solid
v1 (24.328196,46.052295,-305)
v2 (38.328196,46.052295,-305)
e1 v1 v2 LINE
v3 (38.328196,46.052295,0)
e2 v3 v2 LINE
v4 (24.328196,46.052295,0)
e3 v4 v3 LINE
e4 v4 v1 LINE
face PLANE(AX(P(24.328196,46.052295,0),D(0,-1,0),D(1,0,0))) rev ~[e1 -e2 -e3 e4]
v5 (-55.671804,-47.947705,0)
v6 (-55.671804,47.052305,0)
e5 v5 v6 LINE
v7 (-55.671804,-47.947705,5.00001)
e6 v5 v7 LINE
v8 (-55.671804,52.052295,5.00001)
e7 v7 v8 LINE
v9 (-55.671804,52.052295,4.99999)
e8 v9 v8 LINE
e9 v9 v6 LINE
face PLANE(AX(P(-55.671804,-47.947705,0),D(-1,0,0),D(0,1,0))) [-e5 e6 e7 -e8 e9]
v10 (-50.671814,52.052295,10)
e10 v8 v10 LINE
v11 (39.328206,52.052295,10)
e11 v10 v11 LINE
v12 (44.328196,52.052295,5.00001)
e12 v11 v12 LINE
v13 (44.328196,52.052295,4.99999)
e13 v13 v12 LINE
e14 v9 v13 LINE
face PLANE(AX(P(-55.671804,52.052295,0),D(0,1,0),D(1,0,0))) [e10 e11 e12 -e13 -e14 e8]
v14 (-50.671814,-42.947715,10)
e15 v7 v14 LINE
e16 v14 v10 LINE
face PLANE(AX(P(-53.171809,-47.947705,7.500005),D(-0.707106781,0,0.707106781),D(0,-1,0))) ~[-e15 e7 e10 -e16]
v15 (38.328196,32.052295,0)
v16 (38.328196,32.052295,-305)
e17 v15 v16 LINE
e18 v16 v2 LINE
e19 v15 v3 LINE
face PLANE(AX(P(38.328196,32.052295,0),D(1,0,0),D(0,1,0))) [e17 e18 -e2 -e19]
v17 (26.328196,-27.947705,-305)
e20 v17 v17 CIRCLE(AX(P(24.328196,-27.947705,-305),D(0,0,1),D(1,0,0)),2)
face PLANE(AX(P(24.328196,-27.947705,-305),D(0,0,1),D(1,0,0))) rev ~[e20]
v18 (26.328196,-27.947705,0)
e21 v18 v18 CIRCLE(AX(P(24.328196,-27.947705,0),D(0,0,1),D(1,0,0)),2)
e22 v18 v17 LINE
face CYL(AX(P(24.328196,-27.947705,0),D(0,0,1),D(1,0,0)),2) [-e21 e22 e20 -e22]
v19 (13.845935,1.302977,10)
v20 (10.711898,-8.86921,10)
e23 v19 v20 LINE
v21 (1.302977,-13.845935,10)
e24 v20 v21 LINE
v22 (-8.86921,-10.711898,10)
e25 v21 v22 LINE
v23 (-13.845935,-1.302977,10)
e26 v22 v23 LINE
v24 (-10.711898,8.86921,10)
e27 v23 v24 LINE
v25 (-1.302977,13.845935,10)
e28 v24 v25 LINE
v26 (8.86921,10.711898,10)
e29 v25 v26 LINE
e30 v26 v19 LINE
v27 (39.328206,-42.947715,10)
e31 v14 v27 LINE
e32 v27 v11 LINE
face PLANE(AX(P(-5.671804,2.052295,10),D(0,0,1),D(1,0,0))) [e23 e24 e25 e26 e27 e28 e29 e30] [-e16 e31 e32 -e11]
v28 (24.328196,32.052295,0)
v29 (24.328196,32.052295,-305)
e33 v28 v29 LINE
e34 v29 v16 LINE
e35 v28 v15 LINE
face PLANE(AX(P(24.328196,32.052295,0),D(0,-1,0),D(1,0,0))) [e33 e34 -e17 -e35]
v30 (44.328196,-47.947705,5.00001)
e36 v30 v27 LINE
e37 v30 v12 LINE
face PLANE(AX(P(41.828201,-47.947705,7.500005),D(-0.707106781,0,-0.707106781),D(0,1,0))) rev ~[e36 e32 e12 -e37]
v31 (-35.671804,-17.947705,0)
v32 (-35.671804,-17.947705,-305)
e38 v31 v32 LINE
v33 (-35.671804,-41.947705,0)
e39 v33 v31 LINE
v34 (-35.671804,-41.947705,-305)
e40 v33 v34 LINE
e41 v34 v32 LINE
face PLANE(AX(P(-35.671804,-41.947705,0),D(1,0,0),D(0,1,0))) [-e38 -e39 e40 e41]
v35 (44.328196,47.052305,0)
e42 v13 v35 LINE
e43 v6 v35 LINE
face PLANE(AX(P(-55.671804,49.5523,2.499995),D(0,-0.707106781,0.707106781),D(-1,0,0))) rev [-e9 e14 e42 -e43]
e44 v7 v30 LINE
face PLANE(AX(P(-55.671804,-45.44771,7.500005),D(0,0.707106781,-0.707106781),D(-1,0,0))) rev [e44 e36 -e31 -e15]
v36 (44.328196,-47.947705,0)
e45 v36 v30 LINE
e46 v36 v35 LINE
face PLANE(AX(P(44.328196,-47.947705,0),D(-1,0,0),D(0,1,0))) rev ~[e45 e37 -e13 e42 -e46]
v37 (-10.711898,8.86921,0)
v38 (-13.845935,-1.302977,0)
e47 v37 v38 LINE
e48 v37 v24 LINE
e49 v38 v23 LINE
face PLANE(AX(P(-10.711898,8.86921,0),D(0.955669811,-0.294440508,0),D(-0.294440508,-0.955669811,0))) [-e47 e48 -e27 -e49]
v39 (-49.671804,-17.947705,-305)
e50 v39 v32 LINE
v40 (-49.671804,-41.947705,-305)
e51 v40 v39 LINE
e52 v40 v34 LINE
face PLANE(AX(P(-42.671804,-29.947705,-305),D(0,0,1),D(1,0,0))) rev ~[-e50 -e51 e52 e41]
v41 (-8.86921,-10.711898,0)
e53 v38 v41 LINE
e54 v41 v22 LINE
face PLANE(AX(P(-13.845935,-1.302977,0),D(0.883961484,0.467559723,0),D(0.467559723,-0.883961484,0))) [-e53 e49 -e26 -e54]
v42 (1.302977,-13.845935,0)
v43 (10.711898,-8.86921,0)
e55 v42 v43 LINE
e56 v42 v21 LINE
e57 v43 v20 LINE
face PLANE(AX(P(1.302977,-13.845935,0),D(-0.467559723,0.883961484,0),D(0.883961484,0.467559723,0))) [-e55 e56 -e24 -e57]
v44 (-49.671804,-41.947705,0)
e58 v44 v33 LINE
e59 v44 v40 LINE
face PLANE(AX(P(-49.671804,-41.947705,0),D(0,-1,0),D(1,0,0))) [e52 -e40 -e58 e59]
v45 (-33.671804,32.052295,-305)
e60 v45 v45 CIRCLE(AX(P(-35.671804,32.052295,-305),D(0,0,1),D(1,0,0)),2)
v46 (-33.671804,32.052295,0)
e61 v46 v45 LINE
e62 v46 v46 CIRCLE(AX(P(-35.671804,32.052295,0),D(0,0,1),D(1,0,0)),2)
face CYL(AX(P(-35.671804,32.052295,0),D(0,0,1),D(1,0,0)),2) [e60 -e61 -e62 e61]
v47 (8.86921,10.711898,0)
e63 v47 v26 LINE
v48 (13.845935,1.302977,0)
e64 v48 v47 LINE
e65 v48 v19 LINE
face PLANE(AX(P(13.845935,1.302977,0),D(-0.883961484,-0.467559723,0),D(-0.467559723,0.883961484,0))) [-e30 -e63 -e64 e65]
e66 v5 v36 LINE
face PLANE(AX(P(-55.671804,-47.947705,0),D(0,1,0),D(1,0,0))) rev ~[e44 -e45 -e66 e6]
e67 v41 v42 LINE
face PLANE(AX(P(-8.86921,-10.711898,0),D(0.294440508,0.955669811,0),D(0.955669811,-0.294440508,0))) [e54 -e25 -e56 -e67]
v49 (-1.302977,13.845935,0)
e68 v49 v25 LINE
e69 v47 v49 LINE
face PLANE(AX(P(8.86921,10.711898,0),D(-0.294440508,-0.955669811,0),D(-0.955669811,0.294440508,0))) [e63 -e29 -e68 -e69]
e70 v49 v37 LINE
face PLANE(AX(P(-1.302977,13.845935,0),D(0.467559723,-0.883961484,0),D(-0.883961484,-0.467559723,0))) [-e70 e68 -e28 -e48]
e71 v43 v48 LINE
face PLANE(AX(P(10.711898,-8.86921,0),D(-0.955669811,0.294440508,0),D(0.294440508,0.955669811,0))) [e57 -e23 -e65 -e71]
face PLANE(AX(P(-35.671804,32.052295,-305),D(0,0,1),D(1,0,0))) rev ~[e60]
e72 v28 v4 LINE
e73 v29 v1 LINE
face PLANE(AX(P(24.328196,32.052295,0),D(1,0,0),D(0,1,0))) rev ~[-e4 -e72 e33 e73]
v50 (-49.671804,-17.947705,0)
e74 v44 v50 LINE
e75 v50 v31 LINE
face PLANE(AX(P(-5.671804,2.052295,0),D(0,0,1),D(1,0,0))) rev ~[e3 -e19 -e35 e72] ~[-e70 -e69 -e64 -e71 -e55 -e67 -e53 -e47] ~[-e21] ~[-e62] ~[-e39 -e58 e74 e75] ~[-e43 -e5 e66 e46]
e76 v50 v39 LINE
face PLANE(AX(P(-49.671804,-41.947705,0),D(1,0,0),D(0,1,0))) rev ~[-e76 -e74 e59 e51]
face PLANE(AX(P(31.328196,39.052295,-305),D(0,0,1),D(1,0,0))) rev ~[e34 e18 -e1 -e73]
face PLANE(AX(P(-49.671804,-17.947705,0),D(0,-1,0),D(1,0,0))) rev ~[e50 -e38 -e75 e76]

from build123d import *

# Parameters (mm, degrees)
F0_W     = 100
F0_H     = 100
F1_DEPTH = 10
F3_DEPTH = 28
F4_R     = 2
F5_DEPTH = 305
F6_R     = 2
F7_DEPTH = 305
F8_W     = 14
F8_H     = 24
F8_H_2   = 14
F9_DEPTH = 305
F10_SIZE = 4.99999


# Not quite as in the source:
# - a fillet or chamfer is up to 0.001 mm smaller than in the source, because OpenCascade refuses the exact size


with BuildPart() as f1:
    # F0 (on Top) → F1 (new body)
    with BuildSketch(Plane.XY):
        with Locations((-5.6718036532, 2.052295208)):
            Rectangle(F0_W, F0_H)
    extrude(amount=F1_DEPTH)

    # F2 (on Top) → F3 (cut)
    with BuildSketch(Plane.XY):
        Polygon((-8.8692104674, -10.7118982853), (1.3029770516, -13.8459347822), (10.7118982853, -8.8692104674), (13.8459347822, 1.3029770516), (8.8692104674, 10.7118982853), (-1.3029770516, 13.8459347822), (-10.7118982853, 8.8692104674), (-13.8459347822, -1.3029770516), align=None)
    extrude(amount=F3_DEPTH, mode=Mode.SUBTRACT)

    # F4 (on Top) → F5 (join)
    with BuildSketch(Plane.XY):
        with Locations((24.3281963468, -27.947704792)):
            Circle(F4_R)
    extrude(amount=-F5_DEPTH)

    # F6 (on Top) → F7 (join)
    with BuildSketch(Plane.XY):
        with Locations((-35.6718036532, 32.052295208)):
            Circle(F6_R)
    extrude(amount=-F7_DEPTH)

    # F8 (on Top) → F9 (join)
    with BuildSketch(Plane.XY):
        with Locations((-42.6718036532, -29.947704792)):
            Rectangle(F8_W, F8_H)
        with Locations((31.3281963468, 39.052295208)):
            Rectangle(F8_W, F8_H_2)
    extrude(amount=-F9_DEPTH)

    # F10 (size 5 in the source; OpenCascade refuses exactly that, so slightly less here)
    f10_edges = [f1.edges().sort_by_distance(p)[0] for p in [
        (-55.671804, 2.052295, 10),
        (-5.671804, -47.947705, 10),
        (-5.671804, 52.052295, 0),
        (44.328196, 2.052295, 10),
    ]]
    chamfer(f10_edges, length=F10_SIZE)


solid = f1.part
